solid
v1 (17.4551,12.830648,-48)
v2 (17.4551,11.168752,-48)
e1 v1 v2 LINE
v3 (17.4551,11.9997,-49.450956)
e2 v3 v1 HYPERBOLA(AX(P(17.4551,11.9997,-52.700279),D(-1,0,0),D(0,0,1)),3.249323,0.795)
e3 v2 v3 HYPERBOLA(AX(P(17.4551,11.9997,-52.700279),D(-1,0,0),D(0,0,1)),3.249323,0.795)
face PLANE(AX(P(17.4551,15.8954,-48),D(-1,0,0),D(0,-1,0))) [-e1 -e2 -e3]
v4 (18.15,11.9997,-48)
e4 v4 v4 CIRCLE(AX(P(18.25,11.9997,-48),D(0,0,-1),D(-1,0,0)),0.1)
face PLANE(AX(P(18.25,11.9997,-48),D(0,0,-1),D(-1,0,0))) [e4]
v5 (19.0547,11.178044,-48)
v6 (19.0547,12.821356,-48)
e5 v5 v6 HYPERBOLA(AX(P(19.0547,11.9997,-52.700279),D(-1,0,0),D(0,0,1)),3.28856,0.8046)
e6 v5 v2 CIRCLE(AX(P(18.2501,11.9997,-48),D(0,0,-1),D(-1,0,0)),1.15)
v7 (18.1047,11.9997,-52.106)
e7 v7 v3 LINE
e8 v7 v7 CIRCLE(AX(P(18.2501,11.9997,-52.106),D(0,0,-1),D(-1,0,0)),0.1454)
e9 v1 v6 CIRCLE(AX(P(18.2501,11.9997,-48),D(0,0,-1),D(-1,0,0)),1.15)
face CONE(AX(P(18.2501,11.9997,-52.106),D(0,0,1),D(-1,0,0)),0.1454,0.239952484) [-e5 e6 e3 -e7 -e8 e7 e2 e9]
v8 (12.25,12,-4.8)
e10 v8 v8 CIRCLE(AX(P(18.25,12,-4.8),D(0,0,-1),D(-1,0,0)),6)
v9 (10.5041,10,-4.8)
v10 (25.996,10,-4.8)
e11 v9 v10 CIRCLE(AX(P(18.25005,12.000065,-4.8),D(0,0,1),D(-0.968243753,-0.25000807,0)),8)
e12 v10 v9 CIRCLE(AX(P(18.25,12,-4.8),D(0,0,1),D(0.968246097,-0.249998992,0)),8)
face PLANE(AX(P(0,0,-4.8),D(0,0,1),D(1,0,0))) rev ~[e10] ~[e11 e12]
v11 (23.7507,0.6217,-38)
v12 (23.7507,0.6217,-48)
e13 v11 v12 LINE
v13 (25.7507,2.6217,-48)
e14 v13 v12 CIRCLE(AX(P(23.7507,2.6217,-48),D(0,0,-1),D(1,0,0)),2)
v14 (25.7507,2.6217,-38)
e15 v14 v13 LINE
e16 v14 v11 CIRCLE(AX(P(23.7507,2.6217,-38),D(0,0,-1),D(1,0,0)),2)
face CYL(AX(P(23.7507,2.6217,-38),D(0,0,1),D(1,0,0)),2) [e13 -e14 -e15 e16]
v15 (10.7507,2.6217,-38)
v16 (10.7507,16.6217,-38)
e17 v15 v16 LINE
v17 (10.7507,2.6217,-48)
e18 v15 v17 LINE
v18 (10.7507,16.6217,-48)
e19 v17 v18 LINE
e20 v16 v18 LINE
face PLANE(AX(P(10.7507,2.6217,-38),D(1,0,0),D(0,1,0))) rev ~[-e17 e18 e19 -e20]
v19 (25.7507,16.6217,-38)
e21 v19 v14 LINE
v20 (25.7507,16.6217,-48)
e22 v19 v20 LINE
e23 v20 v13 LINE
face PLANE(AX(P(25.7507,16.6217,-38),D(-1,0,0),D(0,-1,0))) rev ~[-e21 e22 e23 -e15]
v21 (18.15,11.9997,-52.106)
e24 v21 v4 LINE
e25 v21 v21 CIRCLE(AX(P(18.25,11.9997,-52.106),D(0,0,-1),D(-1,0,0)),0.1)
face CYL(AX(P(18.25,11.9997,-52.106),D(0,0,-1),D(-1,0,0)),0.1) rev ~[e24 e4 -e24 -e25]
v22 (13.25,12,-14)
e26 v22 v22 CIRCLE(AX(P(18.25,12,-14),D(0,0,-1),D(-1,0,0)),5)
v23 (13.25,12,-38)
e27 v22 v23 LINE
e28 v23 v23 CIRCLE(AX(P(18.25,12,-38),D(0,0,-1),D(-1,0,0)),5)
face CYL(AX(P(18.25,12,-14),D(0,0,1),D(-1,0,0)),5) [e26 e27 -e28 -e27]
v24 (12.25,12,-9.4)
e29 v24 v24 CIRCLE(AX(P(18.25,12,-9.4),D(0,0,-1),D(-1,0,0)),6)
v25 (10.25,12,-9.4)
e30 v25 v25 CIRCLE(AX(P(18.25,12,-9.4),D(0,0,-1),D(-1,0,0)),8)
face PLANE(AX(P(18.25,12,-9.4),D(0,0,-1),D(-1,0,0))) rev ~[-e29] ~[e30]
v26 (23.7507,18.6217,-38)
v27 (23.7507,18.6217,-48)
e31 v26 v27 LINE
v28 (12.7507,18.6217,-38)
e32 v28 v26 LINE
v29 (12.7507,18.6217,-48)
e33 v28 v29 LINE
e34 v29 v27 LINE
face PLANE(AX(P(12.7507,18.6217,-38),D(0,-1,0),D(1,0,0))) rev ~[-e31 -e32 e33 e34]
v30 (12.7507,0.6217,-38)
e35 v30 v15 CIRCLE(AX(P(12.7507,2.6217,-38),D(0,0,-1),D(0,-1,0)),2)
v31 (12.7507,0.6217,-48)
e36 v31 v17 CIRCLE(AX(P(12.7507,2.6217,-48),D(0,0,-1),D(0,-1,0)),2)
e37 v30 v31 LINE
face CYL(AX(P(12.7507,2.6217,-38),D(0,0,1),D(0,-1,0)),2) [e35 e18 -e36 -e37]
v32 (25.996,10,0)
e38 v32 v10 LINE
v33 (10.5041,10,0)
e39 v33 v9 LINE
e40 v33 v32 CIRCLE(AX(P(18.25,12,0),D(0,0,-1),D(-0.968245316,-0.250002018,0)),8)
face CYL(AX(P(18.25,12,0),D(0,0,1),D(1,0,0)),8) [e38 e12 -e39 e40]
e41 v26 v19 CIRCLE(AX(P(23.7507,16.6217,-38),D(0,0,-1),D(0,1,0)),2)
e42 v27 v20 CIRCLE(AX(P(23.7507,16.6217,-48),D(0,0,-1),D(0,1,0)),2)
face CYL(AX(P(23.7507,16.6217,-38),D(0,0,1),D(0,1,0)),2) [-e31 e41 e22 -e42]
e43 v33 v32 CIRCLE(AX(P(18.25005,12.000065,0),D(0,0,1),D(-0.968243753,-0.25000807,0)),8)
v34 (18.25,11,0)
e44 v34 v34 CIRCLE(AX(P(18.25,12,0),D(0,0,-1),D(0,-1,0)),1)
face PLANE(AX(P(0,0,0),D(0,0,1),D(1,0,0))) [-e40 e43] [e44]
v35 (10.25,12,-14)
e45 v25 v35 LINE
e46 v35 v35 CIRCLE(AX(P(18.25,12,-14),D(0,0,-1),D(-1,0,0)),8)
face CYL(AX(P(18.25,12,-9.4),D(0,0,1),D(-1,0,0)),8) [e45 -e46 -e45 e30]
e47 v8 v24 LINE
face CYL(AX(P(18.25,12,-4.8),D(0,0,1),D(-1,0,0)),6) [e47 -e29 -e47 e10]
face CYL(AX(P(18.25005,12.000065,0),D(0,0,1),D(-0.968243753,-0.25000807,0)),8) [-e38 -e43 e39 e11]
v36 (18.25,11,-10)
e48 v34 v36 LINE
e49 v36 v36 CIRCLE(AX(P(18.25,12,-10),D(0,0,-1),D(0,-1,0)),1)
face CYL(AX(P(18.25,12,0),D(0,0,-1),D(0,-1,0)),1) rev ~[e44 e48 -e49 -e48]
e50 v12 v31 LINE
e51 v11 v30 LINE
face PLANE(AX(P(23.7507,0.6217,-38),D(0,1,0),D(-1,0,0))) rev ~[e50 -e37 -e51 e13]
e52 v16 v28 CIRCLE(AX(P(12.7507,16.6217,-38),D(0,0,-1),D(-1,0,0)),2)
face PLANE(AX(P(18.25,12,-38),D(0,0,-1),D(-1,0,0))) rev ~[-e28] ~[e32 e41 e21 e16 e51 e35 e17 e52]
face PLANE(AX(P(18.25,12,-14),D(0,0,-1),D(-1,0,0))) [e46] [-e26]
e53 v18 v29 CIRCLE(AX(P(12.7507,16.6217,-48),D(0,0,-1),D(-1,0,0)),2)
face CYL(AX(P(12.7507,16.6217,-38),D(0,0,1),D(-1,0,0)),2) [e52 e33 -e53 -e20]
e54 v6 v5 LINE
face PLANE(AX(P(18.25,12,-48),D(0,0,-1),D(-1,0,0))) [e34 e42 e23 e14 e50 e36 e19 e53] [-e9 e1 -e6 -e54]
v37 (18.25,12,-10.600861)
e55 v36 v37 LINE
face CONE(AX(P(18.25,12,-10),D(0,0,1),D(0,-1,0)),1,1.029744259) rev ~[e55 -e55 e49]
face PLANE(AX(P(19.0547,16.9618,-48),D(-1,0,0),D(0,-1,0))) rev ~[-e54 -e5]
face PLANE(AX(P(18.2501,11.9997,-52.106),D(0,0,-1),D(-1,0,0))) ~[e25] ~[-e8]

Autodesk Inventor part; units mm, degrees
ref_plane "YZ Plane" through (0, 0, 0) normal (1, 0, 0) x (0, 1, 0)
ref_plane "XZ Plane" through (0, 0, 0) normal (0, 1, 0) x (-1, 0, 0)
ref_plane "XY Plane" through (0, 0, 0) normal (0, 0, 1) x (1, 0, 0)
sketch "Sketch1" plane through (0, 0, 0) normal (0, 0, 1) x (1, 0, 0)
  arc A0 (10.5041, 10) -> (25.996, 10) centre (18.25, 12) ccw projected
  circle A1 centre (18.25, 12) radius 8
  point P0 (0, 0)
extrude "Extrusion1" add sketch "Sketch1" against normal blind 4.8
sketch "Sketch2" plane through (18.25, 12, -4.8) normal (0, 0, -1) x (-1, 0, 0)
  circle A0 centre (0, 0) radius 8 projected
  circle A1 centre (0, 0) radius 6
  point P0 (18.25, -12)
  dimension "d2" = 12
extrude "Extrusion2" add sketch "Sketch2" along normal blind 4.6 contours A1
sketch "Sketch3" plane through (18.25, 12, -9.4) normal (0, 0, -1) x (-1, 0, 0)
  circle A0 centre (0, 0) radius 6 projected
  circle A1 centre (0, 0) radius 8
  point P0 (18.25, -12)
extrude "Extrusion3" add sketch "Sketch3" along normal blind 4.6 contours A0 | A1
sketch "Sketch4" plane through (18.25, 12, -14) normal (0, 0, -1) x (-1, 0, 0)
  circle A0 centre (0, 0) radius 8 projected
  circle A1 centre (0, 0) radius 5
  point P0 (18.25, -12)
  dimension "d7" = 10
extrude "Extrusion4" add sketch "Sketch4" along normal blind 24 contours A1
thread "Thread1" size "M10x1.5" class "6g" standard "ANSI Metric M Profile" full length
sketch "Sketch5" plane through (18.25, 12, -38) normal (0, 0, -1) x (-1, 0, 0)
  line L0 (-5.5007, -11.3783) -> (5.4993, -11.3783)
  line L1 (7.4993, -9.3783) -> (7.4993, 4.6217)
  line L2 (5.4993, 6.6217) -> (-5.5007, 6.6217)
  line L3 (-7.5007, 4.6217) -> (-7.5007, -9.3783)
  line L4 (-7.5007, -11.3783) -> (7.4993, 6.6217) construction
  line L5 (7.4993, -11.3783) -> (-7.5007, 6.6217) construction
  arc A0 (7.4993, 4.6217) -> (5.4993, 6.6217) centre (5.4993, 4.6217) ccw
  arc A1 (-5.5007, 6.6217) -> (-7.5007, 4.6217) centre (-5.5007, 4.6217) ccw
  arc A2 (-7.5007, -9.3783) -> (-5.5007, -11.3783) centre (-5.5007, -9.3783) ccw
  arc A3 (5.4993, -11.3783) -> (7.4993, -9.3783) centre (5.4993, -9.3783) ccw
  point P0 (18.25, -12)
  point P1 (-0.0007, -2.3783)
  dimension "d12" = 15
  dimension "d13" = 18
  dimension "d14" = 2
extrude "Extrusion5" add sketch "Sketch5" along normal blind 10
sketch "Sketch6" plane through (18.25, 12, -48) normal (0, 0, -1) x (-1, 0, 0)
  circle A0 centre (0, 0) radius 5 projected
  circle A1 centre (0, 0) radius 1.15
  point P0 (18.25, -12)
  dimension "d17" = 2.3
ref_plane "Work Plane1" through (12.7508, 11.9997, -38) normal (0, 1, 0) x (1, 0, 0)
sketch "Sketch7" plane through (12.7508, 11.9997, -38) normal (0, 1, 0) x (1, 0, 0)
  line L0 (6.6493, 10) -> (4.3493, 10) projected
  line L1 (5.4993, 10) -> (5.4993, 14.106)
  line L2 (5.3539, 14.106) -> (4.3493, 10)
  line L3 (5.4993, 14.106) -> (5.3539, 14.106)
  line L4 (5.4993, 14.106) -> (5.6446, 14.106) construction
  line L5 (5.4993, 10) -> (4.3493, 10)
  line L6 (4.3493, 10) -> (5.3539, 14.106)
  point P0 (-12.7508, -38)
  dimension "d20" = 180
revolve "Revolution1" add sketch "Sketch7" angle 360 about axis through (18.25, 11.9997, -48) along (0, 0, -1)
sketch "Sketch8" plane through (18.25, 11.9997, -52.106) normal (0, 0, -1) x (-1, 0, 0)
  circle A0 centre (0, 0) radius 0.1454 projected
  circle A1 centre (0, 0) radius 0.1
  point P0 (18.25, -11.9997)
  dimension "d22" = 0.2
extrude "Extrusion6" cut sketch "Sketch8" against normal up to surface (4.106 mm away) contours A1
sketch "Sketch9" plane through (18.25, 12, -48) normal (0, 0, -1) x (-1, 0, 0)
  line L0 (2.1554, 3.8954) -> (0.7949, 3.8954)
  line L1 (0.7949, 3.8954) -> (0.7949, -1.2159)
  line L2 (0.7949, -1.2159) -> (2.1554, -1.2159)
  line L3 (2.1554, -1.2159) -> (2.1554, 3.8954)
  line L4 (2.1554, 3.8954) -> (0.7949, -1.2159) construction
  line L5 (0.7949, 3.8954) -> (2.1554, -1.2159) construction
  line L6 (-2.1285, 4.9618) -> (-0.8047, 4.9618)
  line L7 (-0.8047, 4.9618) -> (-0.8047, -1.2159)
  line L8 (-0.8047, -1.2159) -> (-2.1285, -1.2159)
  line L9 (-2.1285, -1.2159) -> (-2.1285, 4.9618)
  line L10 (-2.1285, 4.9618) -> (-0.8047, -1.2159) construction
  line L11 (-0.8047, 4.9618) -> (-2.1285, -1.2159) construction
  point P0 (18.25, -12)
  point P1 (1.4752, 1.3398)
  point P2 (-1.4666, 1.873)
extrude "Extrusion7" cut sketch "Sketch9" along normal blind 10
sketch "Sketch10" plane through (18.25, 12, 0) normal (0, 0, 1) x (1, 0, 0)
  circle A0 centre (0, 0) radius 8 projected
  point P0 (-18.25, -12)
  point P1 (0.8047, 0.8213)
hole "Hole1" at (18.25, 12, 0) direction (0, 0, -1) diameter 2 depth 10 tip angle 118
properties part number "Hotend Mock Up"
